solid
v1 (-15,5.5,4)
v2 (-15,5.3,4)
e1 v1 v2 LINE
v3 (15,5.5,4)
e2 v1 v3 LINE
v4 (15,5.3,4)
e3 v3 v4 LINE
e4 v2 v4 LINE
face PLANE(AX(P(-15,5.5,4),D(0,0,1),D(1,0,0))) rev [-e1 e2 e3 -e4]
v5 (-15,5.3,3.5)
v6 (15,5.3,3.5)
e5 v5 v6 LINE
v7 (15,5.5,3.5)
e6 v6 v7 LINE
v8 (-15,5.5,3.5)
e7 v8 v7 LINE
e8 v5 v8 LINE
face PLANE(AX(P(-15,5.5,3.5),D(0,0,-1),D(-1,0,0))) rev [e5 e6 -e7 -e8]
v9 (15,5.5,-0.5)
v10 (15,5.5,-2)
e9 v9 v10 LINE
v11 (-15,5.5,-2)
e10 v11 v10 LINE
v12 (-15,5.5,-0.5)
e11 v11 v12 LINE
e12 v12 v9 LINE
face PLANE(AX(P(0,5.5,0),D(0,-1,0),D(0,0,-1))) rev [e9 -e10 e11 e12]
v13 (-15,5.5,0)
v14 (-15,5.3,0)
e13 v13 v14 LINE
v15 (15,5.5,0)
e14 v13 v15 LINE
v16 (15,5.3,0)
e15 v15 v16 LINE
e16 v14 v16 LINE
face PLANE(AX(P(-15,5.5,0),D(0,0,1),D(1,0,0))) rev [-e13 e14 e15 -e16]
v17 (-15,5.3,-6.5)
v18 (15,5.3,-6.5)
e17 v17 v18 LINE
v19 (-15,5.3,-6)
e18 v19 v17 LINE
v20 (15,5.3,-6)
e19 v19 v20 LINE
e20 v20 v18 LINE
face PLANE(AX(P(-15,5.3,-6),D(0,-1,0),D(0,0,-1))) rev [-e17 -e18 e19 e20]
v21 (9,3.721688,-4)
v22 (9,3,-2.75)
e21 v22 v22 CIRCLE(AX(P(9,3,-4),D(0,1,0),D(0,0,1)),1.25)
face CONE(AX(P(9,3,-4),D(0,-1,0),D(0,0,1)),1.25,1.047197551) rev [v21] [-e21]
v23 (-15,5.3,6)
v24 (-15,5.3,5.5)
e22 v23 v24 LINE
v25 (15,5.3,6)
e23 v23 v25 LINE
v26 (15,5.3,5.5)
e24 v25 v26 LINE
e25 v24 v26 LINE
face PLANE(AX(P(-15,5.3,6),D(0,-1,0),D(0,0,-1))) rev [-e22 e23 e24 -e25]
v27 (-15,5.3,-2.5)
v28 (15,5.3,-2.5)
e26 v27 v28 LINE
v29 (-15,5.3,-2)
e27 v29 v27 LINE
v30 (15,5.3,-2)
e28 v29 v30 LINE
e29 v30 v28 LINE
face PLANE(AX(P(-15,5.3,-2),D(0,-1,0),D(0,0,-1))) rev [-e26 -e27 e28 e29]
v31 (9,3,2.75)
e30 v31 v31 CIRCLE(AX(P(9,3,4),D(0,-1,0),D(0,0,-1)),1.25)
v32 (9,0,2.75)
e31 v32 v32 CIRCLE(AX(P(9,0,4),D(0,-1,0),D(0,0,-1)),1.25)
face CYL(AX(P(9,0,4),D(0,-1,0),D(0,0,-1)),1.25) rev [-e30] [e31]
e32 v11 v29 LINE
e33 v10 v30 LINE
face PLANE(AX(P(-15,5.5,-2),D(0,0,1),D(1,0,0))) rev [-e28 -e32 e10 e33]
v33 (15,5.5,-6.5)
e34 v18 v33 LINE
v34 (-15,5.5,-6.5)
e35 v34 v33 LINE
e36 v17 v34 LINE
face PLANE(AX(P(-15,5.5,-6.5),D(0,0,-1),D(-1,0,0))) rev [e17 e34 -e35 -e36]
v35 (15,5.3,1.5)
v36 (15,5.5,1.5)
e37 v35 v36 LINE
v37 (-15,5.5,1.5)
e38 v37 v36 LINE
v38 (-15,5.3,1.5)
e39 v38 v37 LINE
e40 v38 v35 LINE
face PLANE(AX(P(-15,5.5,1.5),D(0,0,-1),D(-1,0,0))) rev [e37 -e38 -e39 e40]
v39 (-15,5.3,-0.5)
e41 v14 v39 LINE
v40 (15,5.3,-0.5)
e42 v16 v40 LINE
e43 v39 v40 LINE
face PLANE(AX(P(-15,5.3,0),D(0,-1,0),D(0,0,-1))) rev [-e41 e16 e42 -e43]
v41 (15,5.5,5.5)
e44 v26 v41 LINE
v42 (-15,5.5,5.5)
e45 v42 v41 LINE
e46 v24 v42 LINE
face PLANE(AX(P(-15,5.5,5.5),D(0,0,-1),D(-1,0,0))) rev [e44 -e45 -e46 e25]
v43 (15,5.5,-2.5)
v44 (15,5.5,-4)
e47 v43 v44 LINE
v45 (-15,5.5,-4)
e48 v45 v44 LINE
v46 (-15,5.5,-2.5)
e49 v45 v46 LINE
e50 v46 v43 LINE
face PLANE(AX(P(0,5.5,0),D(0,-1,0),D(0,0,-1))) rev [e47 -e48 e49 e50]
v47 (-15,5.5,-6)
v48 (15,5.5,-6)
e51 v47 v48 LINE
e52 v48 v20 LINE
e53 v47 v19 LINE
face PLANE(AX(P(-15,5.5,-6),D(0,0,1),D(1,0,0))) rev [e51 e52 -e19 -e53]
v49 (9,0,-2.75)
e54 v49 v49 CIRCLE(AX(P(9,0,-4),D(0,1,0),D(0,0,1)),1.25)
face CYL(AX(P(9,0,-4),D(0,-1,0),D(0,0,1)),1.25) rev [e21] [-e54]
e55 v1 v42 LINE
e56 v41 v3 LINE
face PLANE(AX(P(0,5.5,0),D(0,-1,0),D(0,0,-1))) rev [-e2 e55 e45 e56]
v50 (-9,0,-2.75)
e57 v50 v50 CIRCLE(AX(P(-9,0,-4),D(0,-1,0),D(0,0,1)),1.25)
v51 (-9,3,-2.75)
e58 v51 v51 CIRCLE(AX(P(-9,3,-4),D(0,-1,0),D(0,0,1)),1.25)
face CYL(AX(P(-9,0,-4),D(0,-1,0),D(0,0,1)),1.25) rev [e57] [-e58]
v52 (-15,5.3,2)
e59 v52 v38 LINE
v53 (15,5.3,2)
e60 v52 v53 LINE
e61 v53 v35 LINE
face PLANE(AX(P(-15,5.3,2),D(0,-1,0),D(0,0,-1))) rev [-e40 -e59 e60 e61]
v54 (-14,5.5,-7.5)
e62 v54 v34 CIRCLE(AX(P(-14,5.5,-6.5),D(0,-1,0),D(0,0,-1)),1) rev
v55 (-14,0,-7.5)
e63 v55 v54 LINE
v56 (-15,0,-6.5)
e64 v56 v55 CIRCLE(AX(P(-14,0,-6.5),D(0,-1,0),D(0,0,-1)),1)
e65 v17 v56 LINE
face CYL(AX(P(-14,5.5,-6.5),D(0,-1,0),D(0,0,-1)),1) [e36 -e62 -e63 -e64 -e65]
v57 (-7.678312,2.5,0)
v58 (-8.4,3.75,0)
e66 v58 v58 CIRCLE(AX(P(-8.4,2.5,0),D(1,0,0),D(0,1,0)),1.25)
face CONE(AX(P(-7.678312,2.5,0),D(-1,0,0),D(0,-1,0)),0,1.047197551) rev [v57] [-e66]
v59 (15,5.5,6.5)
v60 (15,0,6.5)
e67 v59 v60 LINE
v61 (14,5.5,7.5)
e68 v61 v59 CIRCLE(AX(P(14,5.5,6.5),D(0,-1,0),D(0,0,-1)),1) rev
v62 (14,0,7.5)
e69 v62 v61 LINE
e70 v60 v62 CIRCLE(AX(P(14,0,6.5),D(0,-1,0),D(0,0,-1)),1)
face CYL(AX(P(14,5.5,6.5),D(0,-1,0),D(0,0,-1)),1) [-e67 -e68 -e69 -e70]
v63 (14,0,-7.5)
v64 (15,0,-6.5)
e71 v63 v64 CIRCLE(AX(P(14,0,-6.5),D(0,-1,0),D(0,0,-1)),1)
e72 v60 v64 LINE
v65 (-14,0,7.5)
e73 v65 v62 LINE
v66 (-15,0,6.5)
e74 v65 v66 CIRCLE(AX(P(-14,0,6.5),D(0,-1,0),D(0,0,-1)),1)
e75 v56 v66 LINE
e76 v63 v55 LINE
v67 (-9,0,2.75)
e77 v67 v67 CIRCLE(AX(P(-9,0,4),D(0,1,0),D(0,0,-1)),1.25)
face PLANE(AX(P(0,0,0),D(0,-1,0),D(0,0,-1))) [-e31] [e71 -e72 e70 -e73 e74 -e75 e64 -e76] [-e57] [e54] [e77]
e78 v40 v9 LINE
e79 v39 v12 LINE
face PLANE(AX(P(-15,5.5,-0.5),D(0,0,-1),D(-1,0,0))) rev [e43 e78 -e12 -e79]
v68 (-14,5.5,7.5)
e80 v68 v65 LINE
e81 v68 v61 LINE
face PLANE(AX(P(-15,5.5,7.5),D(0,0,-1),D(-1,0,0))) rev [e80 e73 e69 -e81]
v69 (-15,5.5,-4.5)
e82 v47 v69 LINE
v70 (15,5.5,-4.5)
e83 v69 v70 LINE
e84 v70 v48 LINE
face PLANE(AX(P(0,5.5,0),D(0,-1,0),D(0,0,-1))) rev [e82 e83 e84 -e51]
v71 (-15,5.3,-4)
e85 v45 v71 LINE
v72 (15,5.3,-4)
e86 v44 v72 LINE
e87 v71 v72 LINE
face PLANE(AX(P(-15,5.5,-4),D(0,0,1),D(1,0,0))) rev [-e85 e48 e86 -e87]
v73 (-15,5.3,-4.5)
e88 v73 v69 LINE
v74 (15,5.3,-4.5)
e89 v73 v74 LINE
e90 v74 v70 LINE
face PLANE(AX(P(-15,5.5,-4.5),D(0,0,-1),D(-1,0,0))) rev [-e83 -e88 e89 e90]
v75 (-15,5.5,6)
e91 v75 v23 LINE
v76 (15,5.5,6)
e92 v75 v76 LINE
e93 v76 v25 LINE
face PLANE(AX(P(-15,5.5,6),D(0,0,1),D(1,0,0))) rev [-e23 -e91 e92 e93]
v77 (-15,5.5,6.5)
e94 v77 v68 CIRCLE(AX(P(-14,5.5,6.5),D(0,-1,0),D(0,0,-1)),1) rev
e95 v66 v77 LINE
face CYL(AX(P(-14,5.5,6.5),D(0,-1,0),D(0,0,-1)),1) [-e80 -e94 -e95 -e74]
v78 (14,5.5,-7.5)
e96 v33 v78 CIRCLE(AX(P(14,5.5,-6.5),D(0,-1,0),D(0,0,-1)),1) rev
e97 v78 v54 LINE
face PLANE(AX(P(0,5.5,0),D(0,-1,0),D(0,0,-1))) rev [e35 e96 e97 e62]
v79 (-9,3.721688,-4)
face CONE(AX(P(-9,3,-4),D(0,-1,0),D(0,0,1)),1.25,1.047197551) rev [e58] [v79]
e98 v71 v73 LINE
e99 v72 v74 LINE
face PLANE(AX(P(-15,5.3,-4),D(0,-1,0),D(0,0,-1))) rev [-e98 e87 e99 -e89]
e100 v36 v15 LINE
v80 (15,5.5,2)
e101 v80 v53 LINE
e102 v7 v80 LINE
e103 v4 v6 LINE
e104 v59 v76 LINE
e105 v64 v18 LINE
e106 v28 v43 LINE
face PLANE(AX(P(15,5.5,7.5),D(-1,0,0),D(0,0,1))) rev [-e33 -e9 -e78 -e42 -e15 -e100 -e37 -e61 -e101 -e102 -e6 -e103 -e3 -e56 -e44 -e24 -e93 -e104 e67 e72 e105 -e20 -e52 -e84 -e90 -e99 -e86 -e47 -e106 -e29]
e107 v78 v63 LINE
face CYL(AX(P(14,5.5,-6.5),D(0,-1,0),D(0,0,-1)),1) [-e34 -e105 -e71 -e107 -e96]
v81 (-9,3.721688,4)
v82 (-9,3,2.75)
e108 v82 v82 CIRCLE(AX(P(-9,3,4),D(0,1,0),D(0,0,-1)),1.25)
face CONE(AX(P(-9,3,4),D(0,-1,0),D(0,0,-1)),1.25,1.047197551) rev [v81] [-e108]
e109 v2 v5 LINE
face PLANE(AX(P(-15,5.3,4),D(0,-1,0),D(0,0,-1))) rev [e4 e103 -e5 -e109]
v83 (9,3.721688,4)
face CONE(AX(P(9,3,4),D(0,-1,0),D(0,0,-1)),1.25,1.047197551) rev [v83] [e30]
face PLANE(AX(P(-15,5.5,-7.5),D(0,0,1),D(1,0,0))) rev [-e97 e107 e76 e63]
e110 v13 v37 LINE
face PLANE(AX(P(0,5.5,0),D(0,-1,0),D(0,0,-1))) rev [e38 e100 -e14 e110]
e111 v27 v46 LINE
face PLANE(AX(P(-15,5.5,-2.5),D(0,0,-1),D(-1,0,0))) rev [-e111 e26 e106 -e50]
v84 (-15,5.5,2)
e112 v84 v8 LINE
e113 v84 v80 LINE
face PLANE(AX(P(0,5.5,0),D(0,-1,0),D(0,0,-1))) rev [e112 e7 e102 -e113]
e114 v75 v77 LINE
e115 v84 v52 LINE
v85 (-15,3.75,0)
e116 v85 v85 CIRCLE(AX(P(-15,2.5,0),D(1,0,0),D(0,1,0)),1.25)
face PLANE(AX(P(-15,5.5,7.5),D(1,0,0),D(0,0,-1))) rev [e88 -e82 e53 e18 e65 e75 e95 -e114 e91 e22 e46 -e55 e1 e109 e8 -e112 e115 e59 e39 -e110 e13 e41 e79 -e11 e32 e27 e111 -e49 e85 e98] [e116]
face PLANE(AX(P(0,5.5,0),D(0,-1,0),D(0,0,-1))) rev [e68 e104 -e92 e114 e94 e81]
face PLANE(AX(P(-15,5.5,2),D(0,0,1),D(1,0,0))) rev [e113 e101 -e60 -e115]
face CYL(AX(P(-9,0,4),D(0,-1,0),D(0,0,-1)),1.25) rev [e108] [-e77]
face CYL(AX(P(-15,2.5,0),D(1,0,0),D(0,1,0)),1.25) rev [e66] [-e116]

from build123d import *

# Parameters (mm, degrees)
SKETCH1_W               = 30
SKETCH1_H               = 15
BOSS_EXTRUDE1_DEPTH     = 5.5
CUT_EXTRUDE2_DEPTH      = 18.649362595
CUT_EXTRUDE2_DEPTH_BACK = 18.649362595
SKETCH2_W               = 0.5
SKETCH2_H               = 0.2
FILLET1_R               = 1


with BuildPart() as part:
    # Sketch1 → Boss-Extrude1 (new body)
    with BuildSketch(Plane(origin=(0, 0, 0), x_dir=(1, 0, 0), z_dir=(0, 1, 0))):
        Rectangle(SKETCH1_W, SKETCH1_H)
    extrude(amount=BOSS_EXTRUDE1_DEPTH)

    # Sketch2 → Cut-Extrude2 (cut, two sides: drawn at the far end of the back side and taken through both)
    with BuildSketch(Plane(origin=(0, 0, 0), x_dir=(0, 0, -1), z_dir=(1, 0, 0)).offset(-CUT_EXTRUDE2_DEPTH_BACK)):
        with Locations((-5.75, 5.4)):
            Rectangle(SKETCH2_W, SKETCH2_H)
        with Locations((-3.75, 5.4)):
            Rectangle(SKETCH2_W, SKETCH2_H)
        with Locations((-1.75, 5.4)):
            Rectangle(SKETCH2_W, SKETCH2_H)
        with Locations((0.25, 5.4)):
            Rectangle(SKETCH2_W, SKETCH2_H)
        with Locations((2.25, 5.4)):
            Rectangle(SKETCH2_W, SKETCH2_H)
        with Locations((4.25, 5.4)):
            Rectangle(SKETCH2_W, SKETCH2_H)
        with Locations((6.25, 5.4)):
            Rectangle(SKETCH2_W, SKETCH2_H)
    extrude(amount=CUT_EXTRUDE2_DEPTH + CUT_EXTRUDE2_DEPTH_BACK, mode=Mode.SUBTRACT)

    # Sketch8 → Cut-Revolve1 (revolve, cut)
    with BuildSketch(Plane.XY.offset(4), mode=Mode.PRIVATE) as cut_revolve1_sk:
        Polygon((10.25, 0), (10.25, 3), (9, 3.721687836), (9, 0), align=None)
    cut_revolve1 = revolve(cut_revolve1_sk.sketch.rotate(Axis((9, 0, 4), (0, 1, 0)), 90), axis=Axis((9, 0, 4), (0, 1, 0)), mode=Mode.SUBTRACT)

    # Mirror1: Cut-Revolve1 across plane
    add(cut_revolve1.mirror(Plane.XY), mode=Mode.SUBTRACT)

    # Mirror2: Cut-Revolve1 across plane
    add(cut_revolve1.mirror(Plane(origin=(0, 0, 0), x_dir=(0, 0, 1), z_dir=(1, 0, 0))), mode=Mode.SUBTRACT)

    # Mirror2 copy 1 sketch → Mirror2 copy 1 (revolve, cut)
    with BuildSketch(Plane(origin=(0, 0, -4), x_dir=(-1, 0, 0), z_dir=(0, 0, -1))):
        Polygon((10.25, 0), (10.25, 3), (9, 3.721687836), (9, 0), align=None)
    revolve(axis=Axis((-9, 0, -4), (0, 1, 0)), mode=Mode.SUBTRACT)

    # Sketch9 → Cut-Revolve2 (revolve, cut)
    with BuildSketch(Plane.XY, mode=Mode.PRIVATE) as cut_revolve2_sk:
        Polygon((-15, 2.5), (-7.678312164, 2.5), (-8.4, 3.75), (-15, 3.75), align=None)
    revolve(cut_revolve2_sk.sketch.rotate(Axis((-15, 2.5, 0), (-1, 0, 0)), 180), axis=Axis((-15, 2.5, 0), (-1, 0, 0)), mode=Mode.SUBTRACT)

    # Fillet1
    fillet1_edges = [part.edges().sort_by_distance(p)[0] for p in [
        (-15, 2.75, -7.5),
        (15, 2.75, -7.5),
        (15, 2.75, 7.5),
        (-15, 2.75, 7.5),
    ]]
    fillet(fillet1_edges, radius=FILLET1_R - 0.0001)  # a hair under: the kernel refuses the full size


solid = part.part
